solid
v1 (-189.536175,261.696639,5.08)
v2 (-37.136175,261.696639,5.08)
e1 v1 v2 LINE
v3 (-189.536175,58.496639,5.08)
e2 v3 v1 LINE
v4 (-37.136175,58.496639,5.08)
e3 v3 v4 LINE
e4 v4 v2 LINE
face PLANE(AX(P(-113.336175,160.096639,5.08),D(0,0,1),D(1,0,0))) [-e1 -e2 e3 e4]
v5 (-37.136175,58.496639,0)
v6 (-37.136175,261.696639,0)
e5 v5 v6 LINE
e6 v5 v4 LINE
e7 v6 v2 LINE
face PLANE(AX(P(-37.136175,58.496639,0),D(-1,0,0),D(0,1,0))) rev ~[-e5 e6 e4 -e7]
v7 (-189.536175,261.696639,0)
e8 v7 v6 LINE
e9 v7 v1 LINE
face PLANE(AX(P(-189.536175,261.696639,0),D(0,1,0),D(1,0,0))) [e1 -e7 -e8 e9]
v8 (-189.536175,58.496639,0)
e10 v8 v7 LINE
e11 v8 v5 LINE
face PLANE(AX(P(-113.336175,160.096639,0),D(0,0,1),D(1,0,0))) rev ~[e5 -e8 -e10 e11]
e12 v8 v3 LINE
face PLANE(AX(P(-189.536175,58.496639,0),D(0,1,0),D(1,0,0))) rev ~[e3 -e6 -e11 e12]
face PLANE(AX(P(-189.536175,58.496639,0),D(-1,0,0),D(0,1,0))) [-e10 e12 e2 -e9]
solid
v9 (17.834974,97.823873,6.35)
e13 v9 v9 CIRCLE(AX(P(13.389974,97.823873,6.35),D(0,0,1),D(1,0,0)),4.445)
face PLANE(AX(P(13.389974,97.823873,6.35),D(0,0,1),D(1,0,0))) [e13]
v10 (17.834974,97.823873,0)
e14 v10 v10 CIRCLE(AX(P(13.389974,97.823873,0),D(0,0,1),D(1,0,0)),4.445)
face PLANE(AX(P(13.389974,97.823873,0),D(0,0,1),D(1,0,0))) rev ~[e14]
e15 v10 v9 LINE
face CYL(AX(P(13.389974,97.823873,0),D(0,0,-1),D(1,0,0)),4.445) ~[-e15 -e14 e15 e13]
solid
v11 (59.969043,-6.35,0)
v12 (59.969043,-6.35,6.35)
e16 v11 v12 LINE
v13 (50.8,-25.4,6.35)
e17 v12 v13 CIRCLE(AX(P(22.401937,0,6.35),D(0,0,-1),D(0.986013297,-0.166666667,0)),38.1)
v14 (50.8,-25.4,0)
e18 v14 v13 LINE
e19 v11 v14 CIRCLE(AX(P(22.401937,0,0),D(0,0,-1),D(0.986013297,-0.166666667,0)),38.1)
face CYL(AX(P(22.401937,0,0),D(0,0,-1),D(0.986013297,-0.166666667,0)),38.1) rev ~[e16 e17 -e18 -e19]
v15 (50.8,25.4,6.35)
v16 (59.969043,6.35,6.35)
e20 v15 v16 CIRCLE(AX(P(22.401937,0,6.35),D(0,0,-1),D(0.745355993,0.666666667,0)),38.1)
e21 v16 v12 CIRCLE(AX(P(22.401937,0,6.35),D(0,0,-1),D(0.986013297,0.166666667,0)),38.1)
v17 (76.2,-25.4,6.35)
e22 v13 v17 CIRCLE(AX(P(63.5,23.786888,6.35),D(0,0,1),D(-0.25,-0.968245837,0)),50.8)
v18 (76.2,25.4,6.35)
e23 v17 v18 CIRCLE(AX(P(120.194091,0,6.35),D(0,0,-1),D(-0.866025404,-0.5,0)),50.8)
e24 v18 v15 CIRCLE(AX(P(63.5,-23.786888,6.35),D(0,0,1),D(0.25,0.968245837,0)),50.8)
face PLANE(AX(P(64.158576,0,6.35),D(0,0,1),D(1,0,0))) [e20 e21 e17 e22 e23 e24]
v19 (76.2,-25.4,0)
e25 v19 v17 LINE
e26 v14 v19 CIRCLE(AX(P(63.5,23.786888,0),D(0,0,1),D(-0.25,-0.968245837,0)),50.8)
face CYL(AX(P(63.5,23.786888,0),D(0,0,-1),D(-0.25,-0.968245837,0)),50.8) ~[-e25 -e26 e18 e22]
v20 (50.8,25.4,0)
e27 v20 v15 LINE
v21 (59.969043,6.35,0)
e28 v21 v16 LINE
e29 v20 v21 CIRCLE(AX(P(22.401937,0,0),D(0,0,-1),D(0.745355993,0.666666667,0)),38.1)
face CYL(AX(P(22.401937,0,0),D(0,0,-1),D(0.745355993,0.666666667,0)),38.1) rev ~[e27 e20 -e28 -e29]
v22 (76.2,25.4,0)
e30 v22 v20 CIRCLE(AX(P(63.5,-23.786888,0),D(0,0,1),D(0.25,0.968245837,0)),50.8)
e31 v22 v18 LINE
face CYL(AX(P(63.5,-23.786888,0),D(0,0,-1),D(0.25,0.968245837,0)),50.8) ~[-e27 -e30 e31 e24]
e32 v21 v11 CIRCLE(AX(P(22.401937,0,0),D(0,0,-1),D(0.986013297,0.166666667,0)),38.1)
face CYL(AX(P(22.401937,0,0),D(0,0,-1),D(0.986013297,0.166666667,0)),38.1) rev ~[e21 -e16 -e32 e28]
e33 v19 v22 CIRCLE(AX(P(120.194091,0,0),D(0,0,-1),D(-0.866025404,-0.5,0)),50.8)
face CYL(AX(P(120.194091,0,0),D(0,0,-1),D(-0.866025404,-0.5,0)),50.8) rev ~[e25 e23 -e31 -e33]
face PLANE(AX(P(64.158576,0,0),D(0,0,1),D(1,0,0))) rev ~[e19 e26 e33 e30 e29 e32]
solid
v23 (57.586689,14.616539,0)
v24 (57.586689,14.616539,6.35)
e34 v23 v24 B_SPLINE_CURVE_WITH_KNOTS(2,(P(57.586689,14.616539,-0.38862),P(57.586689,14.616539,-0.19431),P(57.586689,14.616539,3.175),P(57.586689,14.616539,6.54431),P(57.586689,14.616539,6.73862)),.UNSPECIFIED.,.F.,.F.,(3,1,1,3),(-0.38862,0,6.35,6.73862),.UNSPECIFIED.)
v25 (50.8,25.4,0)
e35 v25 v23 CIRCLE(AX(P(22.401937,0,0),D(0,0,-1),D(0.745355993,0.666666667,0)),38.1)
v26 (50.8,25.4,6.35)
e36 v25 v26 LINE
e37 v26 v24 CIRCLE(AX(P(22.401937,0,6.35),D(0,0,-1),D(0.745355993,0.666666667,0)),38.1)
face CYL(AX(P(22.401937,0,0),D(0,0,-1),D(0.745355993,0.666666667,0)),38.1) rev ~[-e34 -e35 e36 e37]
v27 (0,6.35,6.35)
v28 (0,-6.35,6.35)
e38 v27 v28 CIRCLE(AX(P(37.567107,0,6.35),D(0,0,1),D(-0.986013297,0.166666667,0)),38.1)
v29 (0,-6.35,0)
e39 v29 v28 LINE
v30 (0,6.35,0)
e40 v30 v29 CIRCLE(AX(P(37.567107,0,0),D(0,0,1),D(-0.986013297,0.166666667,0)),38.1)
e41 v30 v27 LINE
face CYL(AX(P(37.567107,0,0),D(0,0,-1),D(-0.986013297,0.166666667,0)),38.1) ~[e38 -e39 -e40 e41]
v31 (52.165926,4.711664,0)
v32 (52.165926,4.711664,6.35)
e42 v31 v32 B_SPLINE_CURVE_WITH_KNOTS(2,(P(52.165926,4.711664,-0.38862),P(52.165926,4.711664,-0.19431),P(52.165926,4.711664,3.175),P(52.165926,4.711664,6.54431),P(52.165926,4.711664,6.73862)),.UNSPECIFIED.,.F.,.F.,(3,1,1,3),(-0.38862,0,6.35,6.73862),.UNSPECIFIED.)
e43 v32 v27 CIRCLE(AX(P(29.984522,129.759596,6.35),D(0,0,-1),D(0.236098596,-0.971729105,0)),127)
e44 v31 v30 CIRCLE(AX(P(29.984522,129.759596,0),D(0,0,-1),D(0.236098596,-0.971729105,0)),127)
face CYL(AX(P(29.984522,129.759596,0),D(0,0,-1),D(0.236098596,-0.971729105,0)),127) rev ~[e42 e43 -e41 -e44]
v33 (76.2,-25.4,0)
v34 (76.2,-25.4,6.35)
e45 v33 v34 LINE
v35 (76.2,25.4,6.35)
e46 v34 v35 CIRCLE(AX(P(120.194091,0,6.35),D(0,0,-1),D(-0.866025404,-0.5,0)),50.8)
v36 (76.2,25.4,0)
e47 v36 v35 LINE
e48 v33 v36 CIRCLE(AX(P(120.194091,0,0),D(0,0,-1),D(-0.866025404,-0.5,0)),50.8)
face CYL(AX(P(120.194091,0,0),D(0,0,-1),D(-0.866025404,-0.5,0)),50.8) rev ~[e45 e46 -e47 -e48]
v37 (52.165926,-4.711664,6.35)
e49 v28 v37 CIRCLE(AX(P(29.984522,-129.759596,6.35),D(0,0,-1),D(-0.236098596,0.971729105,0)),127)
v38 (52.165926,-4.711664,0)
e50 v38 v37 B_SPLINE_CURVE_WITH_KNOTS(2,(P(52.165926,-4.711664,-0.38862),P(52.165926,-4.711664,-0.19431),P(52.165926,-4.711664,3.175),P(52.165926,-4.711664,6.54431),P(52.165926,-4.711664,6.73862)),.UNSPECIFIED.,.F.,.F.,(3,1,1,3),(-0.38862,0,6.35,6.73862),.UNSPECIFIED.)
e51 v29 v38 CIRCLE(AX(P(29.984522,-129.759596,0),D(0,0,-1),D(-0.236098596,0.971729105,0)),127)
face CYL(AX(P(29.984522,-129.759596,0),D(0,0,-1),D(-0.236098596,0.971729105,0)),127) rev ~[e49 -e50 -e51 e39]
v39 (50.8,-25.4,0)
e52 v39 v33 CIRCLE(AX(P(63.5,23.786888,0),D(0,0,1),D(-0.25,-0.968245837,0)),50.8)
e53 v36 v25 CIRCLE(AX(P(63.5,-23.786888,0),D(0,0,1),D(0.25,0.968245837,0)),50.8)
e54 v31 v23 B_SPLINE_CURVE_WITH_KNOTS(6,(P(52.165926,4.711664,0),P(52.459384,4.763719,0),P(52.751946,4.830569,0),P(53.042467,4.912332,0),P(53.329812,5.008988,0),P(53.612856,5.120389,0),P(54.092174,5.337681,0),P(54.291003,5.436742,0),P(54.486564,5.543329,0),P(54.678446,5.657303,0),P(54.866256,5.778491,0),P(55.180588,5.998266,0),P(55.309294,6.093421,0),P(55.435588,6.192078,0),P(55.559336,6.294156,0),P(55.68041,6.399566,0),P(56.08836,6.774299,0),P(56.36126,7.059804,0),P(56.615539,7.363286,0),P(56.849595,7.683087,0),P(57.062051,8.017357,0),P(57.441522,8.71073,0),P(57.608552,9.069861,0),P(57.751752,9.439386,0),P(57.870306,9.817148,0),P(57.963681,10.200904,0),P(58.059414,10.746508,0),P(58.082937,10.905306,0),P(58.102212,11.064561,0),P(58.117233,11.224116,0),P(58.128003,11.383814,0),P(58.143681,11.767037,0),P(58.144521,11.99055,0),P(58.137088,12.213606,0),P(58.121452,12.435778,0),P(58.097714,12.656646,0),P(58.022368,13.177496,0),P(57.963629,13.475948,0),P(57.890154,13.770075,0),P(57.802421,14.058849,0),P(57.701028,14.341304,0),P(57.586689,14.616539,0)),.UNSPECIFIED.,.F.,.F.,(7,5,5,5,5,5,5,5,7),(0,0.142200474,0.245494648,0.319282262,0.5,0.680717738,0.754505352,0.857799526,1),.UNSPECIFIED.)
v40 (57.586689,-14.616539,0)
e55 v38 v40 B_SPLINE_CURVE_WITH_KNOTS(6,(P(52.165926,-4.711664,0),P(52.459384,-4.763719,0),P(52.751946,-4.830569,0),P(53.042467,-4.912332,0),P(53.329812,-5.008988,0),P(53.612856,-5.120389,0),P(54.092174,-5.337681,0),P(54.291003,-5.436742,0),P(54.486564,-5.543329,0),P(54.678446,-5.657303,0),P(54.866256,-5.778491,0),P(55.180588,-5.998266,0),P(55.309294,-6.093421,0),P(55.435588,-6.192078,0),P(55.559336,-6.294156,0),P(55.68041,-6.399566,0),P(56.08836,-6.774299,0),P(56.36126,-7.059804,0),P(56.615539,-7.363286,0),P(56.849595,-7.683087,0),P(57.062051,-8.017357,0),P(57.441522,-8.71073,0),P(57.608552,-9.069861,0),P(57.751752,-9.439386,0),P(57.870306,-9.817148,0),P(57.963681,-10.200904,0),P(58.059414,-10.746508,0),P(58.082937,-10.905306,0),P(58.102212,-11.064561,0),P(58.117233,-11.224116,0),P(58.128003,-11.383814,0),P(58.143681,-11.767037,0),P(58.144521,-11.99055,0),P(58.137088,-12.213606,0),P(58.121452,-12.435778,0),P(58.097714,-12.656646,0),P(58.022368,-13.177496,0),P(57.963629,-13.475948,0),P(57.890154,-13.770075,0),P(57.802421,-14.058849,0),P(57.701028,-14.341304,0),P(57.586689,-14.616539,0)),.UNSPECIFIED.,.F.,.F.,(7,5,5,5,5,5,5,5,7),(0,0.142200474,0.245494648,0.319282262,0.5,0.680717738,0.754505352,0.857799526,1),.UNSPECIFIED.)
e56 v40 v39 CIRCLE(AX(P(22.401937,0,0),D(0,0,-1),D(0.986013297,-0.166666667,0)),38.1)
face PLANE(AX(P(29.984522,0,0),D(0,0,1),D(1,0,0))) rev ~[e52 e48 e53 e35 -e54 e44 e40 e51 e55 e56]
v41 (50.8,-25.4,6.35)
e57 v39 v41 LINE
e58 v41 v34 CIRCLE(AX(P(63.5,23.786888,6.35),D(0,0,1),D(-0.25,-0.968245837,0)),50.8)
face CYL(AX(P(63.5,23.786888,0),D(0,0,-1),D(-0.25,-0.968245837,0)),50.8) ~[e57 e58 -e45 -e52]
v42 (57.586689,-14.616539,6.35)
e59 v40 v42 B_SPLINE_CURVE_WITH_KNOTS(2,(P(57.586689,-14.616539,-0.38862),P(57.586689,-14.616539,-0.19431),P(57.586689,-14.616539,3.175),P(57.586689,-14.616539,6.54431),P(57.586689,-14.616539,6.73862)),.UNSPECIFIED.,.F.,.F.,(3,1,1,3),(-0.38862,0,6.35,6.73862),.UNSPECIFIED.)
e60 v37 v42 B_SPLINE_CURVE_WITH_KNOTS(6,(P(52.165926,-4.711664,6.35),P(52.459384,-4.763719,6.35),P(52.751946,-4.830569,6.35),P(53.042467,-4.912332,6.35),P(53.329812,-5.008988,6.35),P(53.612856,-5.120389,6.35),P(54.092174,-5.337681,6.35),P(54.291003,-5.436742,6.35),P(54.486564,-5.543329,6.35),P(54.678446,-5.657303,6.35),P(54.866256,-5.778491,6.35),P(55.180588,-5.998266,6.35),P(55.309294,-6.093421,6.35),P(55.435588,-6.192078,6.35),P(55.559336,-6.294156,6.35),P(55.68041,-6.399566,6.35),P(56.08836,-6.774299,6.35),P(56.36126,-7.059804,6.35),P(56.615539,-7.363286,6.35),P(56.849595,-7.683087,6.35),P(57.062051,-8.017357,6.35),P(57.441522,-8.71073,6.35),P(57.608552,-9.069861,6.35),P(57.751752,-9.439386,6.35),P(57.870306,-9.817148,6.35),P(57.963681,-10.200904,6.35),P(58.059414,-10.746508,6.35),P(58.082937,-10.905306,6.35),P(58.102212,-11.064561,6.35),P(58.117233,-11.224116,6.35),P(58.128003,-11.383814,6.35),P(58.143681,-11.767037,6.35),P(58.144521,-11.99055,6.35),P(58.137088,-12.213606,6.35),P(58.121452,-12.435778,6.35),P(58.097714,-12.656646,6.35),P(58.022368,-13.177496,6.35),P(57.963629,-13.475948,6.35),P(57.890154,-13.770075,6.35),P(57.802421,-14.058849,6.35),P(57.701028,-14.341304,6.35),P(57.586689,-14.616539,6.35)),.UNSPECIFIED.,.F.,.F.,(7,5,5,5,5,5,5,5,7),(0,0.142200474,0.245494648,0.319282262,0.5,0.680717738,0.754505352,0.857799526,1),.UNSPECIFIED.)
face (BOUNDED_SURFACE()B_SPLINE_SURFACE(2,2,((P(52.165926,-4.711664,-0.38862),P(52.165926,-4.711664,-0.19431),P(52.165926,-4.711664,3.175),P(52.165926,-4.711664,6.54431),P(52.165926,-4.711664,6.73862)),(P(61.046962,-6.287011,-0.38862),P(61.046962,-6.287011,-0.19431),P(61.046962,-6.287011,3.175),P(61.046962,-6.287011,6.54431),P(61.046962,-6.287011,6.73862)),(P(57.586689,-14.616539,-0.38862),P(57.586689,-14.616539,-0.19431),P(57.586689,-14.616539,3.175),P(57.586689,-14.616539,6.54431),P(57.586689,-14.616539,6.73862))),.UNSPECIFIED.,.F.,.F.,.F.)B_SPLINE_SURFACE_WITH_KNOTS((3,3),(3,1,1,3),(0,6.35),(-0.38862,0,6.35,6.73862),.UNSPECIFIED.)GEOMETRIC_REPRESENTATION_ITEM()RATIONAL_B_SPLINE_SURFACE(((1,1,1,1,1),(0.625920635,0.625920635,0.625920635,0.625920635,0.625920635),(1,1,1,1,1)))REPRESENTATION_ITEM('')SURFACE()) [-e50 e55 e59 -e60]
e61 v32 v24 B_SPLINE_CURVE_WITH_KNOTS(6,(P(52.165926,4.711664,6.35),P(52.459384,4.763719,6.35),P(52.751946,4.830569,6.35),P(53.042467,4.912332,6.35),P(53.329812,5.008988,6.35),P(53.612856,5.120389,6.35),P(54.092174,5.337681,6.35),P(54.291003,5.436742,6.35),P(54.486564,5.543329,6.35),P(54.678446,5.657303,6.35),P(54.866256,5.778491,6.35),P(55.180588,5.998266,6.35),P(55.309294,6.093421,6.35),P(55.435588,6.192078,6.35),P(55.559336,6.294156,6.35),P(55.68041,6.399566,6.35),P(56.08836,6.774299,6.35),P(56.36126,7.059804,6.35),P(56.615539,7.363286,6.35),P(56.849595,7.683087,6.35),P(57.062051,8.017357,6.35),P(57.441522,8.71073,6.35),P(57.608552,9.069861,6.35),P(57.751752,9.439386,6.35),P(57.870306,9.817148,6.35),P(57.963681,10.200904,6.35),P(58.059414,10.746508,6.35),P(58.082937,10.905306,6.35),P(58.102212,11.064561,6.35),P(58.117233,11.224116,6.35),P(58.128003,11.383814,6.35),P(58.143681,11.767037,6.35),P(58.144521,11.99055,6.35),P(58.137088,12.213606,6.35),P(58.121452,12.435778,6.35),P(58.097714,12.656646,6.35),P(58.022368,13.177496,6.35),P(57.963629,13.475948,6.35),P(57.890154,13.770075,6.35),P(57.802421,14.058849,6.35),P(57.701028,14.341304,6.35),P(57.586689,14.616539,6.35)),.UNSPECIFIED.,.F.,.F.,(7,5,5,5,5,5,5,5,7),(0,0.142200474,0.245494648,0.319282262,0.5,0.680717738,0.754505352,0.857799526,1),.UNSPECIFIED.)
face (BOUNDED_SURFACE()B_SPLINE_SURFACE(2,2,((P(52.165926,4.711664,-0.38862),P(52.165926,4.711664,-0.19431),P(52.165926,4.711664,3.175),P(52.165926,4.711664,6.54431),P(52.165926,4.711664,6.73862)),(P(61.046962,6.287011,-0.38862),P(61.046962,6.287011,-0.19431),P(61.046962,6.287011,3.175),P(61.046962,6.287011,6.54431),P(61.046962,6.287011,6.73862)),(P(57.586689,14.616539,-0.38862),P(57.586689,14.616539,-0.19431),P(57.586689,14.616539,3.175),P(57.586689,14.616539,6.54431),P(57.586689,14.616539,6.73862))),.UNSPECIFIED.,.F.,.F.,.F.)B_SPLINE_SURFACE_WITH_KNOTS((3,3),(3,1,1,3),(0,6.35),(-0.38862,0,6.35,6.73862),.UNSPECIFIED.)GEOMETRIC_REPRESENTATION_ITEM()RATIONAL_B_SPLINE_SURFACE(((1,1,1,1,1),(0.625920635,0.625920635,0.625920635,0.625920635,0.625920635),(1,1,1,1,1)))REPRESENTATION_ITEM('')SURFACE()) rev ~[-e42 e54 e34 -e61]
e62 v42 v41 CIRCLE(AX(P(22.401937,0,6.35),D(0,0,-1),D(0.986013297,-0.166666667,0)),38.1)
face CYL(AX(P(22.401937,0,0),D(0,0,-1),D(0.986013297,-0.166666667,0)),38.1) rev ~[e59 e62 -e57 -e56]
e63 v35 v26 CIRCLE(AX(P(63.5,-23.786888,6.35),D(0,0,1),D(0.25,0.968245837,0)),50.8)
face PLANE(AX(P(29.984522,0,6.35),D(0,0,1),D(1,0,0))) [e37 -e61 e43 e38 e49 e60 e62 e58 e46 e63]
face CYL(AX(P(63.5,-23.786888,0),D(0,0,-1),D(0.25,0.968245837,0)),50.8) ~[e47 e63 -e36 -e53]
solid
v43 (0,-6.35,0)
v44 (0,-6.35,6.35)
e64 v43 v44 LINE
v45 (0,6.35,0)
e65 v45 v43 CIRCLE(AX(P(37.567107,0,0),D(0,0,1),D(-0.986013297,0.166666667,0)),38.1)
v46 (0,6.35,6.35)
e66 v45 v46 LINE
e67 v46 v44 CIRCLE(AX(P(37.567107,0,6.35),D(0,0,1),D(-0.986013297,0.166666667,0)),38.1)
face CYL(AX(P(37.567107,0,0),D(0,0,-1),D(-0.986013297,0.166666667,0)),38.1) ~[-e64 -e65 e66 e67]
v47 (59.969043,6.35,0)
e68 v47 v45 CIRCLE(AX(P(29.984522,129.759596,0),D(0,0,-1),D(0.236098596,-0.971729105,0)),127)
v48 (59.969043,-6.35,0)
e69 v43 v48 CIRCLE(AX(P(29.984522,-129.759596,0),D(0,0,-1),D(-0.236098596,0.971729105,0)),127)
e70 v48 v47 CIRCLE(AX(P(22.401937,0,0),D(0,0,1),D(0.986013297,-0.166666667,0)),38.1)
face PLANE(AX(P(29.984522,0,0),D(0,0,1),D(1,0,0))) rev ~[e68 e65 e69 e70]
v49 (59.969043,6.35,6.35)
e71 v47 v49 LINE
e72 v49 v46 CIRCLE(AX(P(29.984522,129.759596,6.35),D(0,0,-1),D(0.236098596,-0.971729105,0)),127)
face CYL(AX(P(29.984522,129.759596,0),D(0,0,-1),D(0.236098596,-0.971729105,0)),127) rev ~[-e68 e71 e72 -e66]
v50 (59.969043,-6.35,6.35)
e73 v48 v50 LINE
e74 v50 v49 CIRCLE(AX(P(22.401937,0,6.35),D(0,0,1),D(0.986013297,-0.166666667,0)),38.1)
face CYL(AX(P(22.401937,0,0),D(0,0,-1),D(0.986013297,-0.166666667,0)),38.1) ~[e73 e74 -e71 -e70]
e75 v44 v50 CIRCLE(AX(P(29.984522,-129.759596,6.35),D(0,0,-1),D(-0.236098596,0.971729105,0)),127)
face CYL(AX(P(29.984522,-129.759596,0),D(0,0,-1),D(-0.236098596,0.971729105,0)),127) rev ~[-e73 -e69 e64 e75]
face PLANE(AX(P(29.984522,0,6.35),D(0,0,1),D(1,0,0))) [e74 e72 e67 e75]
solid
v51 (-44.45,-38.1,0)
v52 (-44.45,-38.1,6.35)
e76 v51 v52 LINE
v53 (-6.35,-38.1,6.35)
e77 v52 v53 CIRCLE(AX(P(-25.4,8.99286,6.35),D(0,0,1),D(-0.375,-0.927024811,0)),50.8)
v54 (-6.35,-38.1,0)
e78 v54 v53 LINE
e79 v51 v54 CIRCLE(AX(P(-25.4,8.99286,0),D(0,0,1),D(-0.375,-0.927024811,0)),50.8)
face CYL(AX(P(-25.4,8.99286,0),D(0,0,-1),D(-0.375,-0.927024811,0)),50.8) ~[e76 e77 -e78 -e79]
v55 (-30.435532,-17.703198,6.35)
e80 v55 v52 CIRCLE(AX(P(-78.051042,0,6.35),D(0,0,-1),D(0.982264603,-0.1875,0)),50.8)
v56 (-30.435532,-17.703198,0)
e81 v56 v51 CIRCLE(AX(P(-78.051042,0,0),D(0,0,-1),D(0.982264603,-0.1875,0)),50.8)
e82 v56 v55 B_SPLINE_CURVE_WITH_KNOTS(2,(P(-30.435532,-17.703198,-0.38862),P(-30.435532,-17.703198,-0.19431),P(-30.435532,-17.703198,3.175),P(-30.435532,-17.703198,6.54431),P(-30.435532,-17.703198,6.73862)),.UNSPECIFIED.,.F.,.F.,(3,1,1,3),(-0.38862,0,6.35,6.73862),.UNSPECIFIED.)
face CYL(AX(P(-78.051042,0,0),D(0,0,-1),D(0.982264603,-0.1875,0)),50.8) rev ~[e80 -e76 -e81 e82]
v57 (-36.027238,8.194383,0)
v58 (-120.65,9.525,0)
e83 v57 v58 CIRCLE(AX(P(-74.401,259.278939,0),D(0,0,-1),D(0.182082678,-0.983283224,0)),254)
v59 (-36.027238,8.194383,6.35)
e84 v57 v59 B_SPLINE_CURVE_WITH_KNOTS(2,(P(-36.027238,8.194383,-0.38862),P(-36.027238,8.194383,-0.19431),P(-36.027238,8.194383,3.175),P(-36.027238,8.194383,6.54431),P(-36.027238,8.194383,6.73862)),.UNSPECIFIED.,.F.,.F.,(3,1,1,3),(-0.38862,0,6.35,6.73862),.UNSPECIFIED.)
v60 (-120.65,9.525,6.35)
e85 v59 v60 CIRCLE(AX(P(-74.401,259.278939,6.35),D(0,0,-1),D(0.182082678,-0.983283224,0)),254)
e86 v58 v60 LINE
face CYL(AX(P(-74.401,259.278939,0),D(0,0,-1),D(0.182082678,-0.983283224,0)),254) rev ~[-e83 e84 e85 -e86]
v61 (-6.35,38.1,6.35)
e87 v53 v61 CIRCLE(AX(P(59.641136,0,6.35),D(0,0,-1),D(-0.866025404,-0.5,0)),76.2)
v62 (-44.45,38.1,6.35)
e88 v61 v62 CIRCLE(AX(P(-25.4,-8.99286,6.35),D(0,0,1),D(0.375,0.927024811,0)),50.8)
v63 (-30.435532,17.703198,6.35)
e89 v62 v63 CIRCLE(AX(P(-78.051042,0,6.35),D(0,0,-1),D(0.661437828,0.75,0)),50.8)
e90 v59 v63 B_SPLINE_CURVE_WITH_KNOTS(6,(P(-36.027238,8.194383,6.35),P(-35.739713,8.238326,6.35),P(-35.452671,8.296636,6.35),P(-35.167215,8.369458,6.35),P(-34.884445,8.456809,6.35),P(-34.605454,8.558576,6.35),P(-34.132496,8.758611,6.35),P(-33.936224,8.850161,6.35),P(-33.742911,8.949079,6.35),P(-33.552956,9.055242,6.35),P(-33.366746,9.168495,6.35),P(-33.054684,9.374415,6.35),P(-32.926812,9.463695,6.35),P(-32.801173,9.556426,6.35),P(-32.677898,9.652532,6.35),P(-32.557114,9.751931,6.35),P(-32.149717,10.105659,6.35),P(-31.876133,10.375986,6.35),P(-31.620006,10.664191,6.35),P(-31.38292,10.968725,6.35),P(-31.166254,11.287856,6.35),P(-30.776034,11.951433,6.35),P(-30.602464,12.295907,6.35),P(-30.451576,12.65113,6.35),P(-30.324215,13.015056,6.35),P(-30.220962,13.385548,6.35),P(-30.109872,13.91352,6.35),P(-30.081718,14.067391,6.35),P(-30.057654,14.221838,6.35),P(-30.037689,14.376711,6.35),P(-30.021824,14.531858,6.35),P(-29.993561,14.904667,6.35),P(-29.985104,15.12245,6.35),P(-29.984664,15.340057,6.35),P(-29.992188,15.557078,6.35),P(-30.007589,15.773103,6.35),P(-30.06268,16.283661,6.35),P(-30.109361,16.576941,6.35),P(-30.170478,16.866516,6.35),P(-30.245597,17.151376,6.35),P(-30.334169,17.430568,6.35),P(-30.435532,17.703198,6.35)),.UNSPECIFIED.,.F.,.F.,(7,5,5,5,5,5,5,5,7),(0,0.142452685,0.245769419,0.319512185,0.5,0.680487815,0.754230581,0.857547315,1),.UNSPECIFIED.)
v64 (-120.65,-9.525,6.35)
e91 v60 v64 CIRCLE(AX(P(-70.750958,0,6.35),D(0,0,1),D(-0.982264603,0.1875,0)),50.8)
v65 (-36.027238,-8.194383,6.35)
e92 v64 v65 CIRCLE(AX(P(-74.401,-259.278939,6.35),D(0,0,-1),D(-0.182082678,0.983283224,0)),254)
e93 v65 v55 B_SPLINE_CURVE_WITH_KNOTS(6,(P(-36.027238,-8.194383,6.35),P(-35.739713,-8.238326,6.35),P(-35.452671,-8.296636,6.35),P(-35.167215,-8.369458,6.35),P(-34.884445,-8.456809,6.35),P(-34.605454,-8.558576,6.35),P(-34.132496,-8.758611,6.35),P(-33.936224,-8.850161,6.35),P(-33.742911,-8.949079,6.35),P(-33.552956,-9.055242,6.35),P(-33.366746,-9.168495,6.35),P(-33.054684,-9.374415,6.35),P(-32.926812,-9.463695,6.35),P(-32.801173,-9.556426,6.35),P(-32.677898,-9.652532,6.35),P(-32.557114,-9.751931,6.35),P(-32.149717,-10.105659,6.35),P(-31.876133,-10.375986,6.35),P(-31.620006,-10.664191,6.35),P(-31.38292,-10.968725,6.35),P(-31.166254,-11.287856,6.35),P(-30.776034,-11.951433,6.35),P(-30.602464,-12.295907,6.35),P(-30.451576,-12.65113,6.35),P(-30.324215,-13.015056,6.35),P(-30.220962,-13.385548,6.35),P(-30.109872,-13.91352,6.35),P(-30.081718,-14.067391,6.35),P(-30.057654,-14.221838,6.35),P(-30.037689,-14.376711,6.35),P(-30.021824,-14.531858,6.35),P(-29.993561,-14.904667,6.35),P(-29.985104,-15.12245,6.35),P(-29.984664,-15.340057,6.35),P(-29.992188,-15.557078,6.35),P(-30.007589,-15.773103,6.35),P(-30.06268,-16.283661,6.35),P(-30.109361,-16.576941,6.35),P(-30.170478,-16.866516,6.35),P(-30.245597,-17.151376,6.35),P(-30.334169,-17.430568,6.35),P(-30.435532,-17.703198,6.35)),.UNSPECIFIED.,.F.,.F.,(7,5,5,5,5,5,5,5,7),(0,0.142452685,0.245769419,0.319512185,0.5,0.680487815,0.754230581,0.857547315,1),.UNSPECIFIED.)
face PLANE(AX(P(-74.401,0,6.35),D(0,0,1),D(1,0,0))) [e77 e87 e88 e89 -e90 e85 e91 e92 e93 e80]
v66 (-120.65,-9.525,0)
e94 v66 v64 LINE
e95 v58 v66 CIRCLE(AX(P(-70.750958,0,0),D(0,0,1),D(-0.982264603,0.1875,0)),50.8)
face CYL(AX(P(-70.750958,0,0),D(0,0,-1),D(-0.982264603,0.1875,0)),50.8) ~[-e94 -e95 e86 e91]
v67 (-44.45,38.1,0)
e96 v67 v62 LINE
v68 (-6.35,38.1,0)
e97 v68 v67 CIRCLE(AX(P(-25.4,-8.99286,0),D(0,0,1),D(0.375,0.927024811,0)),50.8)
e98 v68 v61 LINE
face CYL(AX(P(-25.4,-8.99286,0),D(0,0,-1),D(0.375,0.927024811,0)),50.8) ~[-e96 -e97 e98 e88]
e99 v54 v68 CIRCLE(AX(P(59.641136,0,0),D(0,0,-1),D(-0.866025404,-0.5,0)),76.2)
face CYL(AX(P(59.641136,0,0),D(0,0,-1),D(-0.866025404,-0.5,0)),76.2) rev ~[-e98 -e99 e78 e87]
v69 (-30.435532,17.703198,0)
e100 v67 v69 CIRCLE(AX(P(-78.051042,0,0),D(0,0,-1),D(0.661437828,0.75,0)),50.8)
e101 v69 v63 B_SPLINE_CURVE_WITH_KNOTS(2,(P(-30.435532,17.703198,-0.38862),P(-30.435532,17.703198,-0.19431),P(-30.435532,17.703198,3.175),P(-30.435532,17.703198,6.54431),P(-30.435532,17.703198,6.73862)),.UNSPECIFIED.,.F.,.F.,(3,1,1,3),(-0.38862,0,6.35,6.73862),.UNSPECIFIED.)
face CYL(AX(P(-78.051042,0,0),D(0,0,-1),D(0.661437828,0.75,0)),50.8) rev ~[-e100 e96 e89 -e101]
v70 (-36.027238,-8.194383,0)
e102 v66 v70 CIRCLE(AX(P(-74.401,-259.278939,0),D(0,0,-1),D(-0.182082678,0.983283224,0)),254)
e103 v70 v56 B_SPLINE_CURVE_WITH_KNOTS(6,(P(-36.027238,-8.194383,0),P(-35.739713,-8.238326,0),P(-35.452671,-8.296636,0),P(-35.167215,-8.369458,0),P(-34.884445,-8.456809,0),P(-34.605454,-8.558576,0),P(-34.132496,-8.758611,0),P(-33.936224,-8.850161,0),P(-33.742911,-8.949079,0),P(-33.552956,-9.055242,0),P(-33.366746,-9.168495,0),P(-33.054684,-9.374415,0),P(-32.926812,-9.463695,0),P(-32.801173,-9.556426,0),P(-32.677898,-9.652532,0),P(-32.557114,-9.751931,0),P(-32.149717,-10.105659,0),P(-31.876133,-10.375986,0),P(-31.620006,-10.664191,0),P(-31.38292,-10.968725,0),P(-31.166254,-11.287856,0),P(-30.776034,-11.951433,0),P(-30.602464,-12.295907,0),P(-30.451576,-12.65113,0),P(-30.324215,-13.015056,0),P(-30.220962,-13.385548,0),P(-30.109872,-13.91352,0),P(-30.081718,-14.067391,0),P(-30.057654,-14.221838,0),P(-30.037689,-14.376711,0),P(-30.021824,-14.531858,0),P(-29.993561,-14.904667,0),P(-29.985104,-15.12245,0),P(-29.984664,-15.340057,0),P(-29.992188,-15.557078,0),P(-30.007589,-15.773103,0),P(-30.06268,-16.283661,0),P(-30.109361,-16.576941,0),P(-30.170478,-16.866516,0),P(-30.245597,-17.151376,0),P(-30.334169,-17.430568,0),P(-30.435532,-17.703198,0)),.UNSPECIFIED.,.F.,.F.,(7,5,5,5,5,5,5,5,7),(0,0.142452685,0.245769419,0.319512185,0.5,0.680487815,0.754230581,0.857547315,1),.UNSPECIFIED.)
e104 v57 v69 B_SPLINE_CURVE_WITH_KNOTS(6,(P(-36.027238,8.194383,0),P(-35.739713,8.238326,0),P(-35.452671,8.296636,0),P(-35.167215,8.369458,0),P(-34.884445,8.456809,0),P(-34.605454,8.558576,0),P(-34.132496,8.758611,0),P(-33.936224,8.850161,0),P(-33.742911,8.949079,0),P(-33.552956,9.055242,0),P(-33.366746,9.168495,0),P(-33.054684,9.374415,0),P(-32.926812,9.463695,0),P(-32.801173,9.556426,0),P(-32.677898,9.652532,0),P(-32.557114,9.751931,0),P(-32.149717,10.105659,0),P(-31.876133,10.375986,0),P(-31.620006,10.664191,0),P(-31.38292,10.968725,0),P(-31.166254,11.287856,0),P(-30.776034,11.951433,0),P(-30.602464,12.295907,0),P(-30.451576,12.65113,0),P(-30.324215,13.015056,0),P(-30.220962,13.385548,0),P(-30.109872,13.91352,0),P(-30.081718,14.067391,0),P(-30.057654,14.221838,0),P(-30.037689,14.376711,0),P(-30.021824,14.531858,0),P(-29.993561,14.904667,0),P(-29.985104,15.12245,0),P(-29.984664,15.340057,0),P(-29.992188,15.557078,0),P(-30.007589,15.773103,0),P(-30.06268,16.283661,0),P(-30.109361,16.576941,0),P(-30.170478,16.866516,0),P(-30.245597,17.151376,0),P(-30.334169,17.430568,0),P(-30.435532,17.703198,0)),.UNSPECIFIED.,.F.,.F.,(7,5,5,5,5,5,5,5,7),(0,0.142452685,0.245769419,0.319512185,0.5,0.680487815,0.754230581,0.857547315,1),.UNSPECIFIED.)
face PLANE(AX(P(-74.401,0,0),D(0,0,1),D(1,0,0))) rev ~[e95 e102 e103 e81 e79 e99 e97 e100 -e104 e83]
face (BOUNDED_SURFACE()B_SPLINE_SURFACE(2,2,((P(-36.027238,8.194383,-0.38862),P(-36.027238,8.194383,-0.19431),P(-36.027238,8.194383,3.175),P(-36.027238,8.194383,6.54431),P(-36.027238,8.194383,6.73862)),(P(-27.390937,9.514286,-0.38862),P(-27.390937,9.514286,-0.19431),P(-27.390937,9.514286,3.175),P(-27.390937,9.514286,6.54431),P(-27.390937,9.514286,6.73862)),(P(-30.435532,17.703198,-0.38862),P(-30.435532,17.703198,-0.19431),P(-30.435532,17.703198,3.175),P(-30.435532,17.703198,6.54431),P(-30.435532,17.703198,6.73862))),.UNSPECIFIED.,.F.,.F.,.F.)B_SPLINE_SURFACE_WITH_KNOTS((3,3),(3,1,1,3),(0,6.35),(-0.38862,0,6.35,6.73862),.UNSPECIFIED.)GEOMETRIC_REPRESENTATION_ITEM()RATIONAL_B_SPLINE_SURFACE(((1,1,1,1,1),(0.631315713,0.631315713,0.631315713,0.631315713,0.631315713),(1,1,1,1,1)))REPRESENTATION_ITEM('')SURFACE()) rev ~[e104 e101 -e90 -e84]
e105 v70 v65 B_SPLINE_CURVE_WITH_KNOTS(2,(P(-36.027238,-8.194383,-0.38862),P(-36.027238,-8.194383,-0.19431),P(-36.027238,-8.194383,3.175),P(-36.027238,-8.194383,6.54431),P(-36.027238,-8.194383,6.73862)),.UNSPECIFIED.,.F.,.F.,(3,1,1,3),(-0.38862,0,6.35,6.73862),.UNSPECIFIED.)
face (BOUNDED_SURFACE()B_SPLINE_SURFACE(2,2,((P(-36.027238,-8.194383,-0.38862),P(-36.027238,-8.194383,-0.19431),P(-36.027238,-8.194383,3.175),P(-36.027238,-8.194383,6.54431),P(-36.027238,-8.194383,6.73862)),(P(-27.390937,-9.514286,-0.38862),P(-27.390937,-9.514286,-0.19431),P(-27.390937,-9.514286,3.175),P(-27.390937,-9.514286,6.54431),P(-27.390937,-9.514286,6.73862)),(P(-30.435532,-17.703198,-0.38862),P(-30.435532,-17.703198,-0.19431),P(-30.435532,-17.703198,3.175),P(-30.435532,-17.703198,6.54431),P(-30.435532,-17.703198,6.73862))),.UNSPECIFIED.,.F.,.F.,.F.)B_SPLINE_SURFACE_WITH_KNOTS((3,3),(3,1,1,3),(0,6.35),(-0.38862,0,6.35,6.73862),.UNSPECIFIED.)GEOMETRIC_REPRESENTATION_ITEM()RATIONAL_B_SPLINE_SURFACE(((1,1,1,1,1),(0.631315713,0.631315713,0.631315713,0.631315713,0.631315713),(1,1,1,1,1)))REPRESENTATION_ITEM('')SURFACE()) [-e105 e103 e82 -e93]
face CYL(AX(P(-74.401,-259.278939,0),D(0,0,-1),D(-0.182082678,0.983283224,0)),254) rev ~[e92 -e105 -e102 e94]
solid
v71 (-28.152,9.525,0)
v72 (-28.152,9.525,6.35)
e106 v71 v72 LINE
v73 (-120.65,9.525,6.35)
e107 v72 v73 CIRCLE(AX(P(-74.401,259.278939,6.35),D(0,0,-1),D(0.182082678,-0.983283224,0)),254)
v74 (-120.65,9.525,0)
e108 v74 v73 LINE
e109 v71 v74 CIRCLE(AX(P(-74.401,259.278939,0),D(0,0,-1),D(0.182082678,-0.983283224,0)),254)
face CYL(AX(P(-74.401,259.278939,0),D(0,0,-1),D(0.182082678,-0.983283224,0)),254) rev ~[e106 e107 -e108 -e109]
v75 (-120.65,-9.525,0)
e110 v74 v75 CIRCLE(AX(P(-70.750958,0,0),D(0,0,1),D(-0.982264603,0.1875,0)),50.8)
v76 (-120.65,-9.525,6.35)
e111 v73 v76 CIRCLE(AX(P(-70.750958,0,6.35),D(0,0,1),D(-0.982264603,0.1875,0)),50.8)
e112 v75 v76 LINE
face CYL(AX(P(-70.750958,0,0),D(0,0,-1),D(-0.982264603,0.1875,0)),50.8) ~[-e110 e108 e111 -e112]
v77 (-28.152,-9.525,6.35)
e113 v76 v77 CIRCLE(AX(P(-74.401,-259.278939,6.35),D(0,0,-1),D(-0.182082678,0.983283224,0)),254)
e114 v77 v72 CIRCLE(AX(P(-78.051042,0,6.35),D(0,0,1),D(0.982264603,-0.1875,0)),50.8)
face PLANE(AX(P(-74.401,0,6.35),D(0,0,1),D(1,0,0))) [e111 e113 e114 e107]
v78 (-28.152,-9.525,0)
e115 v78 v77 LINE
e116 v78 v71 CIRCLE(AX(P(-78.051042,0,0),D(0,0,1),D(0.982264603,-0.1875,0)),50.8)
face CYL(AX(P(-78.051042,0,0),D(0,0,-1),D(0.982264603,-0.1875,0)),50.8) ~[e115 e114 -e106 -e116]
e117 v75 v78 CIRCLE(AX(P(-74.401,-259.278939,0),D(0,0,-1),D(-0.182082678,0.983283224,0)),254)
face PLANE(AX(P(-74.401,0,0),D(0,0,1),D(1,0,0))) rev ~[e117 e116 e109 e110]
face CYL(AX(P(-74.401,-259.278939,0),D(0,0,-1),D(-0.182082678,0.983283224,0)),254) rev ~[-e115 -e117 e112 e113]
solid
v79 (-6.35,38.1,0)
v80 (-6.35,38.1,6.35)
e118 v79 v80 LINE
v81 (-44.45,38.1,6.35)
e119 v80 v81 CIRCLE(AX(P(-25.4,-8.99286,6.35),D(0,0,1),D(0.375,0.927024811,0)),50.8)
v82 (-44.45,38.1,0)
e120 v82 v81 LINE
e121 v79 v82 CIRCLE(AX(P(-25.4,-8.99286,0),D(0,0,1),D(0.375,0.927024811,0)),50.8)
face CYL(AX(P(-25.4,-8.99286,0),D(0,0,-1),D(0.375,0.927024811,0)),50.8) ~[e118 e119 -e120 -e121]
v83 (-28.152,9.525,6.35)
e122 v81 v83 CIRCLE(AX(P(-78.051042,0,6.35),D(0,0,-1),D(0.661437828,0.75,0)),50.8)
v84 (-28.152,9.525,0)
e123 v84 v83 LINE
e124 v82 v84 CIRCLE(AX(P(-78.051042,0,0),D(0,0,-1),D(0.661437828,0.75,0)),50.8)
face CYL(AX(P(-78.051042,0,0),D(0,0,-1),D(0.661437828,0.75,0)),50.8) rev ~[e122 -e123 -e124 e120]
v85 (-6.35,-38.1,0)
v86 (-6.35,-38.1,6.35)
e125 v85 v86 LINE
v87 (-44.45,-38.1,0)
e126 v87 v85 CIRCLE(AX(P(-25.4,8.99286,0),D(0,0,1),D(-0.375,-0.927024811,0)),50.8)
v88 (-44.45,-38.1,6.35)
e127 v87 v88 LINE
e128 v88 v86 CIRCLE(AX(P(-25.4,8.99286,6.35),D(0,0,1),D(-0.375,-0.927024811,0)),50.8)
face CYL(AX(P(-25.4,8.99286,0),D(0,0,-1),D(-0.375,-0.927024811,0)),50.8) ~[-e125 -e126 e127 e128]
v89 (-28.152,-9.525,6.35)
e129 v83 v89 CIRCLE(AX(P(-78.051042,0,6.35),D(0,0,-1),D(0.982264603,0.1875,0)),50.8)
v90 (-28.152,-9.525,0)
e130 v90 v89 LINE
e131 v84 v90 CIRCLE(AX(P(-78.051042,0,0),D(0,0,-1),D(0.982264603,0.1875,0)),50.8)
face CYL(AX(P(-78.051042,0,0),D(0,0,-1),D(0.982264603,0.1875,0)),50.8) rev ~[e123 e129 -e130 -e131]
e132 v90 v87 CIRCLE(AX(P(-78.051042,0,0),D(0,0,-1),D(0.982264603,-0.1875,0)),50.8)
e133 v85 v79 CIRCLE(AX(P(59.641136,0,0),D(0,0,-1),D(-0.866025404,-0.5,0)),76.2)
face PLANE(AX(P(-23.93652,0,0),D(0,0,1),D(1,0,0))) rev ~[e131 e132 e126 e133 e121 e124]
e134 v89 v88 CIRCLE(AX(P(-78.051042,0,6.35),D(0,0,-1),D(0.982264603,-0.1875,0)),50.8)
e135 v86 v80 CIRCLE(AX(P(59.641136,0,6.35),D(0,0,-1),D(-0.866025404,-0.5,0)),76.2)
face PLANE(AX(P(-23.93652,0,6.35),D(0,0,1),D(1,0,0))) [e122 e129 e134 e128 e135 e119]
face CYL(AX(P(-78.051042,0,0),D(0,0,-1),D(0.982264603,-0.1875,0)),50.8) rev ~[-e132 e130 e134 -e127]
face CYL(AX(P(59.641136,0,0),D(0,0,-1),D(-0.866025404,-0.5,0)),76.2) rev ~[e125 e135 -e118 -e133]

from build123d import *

# Parameters (mm, degrees)
F1_DEPTH  = 6.35
F2_R      = 7.112
F4_DEPTH  = 6.35
F5_R      = 7.239
F6_DEPTH  = 6.35
F7_DEPTH  = 6.35
F8_DEPTH  = 6.35
F9_DEPTH  = 6.35
F10_W     = 152.4
F10_H     = 203.2
F11_DEPTH = 5.08
F12_R     = 4.445
F13_DEPTH = 6.35


# Not quite as in the source:
# - a length typed as a fraction of an inch, garbled in the dataset ("3 / 203.2 mm" for 3/8 in), is restored


with BuildPart() as f1:
    # F0 (on Top) → F1 (new body)
    with BuildSketch(Plane.XY):
        with BuildLine():
            ThreePointArc((-28.1519998261, -9.525), (-27.2510416505, 0), (-28.1519998261, 9.525))
            ThreePointArc((-28.1519998261, 9.525), (-74.400999913, 5.2789388898), (-120.65, 9.525))
            ThreePointArc((-120.65, 9.525), (-121.5509581755, 0), (-120.65, -9.525))
            ThreePointArc((-120.65, -9.525), (-74.400999913, -5.2789388898), (-28.1519998261, -9.525))
        make_face()
        with BuildLine():
            ThreePointArc((-6.35, -38.1), (-16.5588642316, 0), (-6.35, 38.1))
            ThreePointArc((-6.35, 38.1), (-25.4, 41.8071396069), (-44.45, 38.1))
            ThreePointArc((-44.45, 38.1), (-33.9239678598, 25.1682609385), (-28.1519998261, 9.525))
            ThreePointArc((-28.1519998261, 9.525), (-27.2510416505, 0), (-28.1519998261, -9.525))
            ThreePointArc((-28.1519998261, -9.525), (-33.9239678598, -25.1682609385), (-44.45, -38.1))
            ThreePointArc((-44.45, -38.1), (-25.4, -41.8071396069), (-6.35, -38.1))
        make_face()
    extrude(amount=F1_DEPTH)

    # F2
    f2_edges = [f1.edges().sort_by_distance(p)[0] for p in [
        (-28.152, 9.525, 3.175),
        (-28.152, -9.525, 3.175),
    ]]
    fillet(f2_edges, radius=F2_R)


with BuildPart() as f4:
    # F3 (on Top) → F4 (new body)
    with BuildSketch(Plane.XY):
        with BuildLine():
            ThreePointArc((59.9690433084, -6.35), (60.5019366858, 0), (59.9690433084, 6.35))
            ThreePointArc((59.9690433084, 6.35), (29.9845216542, 2.7595963091), (0, 6.35))
            ThreePointArc((0, 6.35), (-0.5328933773, 0), (0, -6.35))
            ThreePointArc((0, -6.35), (29.9845216542, -2.7595963091), (59.9690433084, -6.35))
        make_face()
        with BuildLine():
            ThreePointArc((76.2, -25.4), (69.3940905122, 0), (76.2, 25.4))
            ThreePointArc((76.2, 25.4), (63.5, 27.0131115032), (50.8, 25.4))
            ThreePointArc((50.8, 25.4), (56.7323391914, 16.5237242714), (59.9690433084, 6.35))
            ThreePointArc((59.9690433084, 6.35), (60.5019366858, 0), (59.9690433084, -6.35))
            ThreePointArc((59.9690433084, -6.35), (56.7323391914, -16.5237242714), (50.8, -25.4))
            ThreePointArc((50.8, -25.4), (63.5, -27.0131115032), (76.2, -25.4))
        make_face()
    extrude(amount=F4_DEPTH)

    # F5
    f5_edges = [f4.edges().sort_by_distance(p)[0] for p in [
        (59.969043, -6.35, 3.175),
        (59.969043, 6.35, 3.175),
    ]]
    fillet(f5_edges, radius=F5_R)


with BuildPart() as f6:
    # F0 (on Top) → F6 (new body)
    with BuildSketch(Plane.XY):
        with BuildLine():
            ThreePointArc((-6.35, -38.1), (-16.5588642316, 0), (-6.35, 38.1))
            ThreePointArc((-6.35, 38.1), (-25.4, 41.8071396069), (-44.45, 38.1))
            ThreePointArc((-44.45, 38.1), (-33.9239678598, 25.1682609385), (-28.1519998261, 9.525))
            ThreePointArc((-28.1519998261, 9.525), (-27.2510416505, 0), (-28.1519998261, -9.525))
            ThreePointArc((-28.1519998261, -9.525), (-33.9239678598, -25.1682609385), (-44.45, -38.1))
            ThreePointArc((-44.45, -38.1), (-25.4, -41.8071396069), (-6.35, -38.1))
        make_face()
    extrude(amount=F6_DEPTH)


with BuildPart() as f7:
    # F0 (on Top) → F7 (new body)
    with BuildSketch(Plane.XY):
        with BuildLine():
            ThreePointArc((-28.1519998261, -9.525), (-27.2510416505, 0), (-28.1519998261, 9.525))
            ThreePointArc((-28.1519998261, 9.525), (-74.400999913, 5.2789388898), (-120.65, 9.525))
            ThreePointArc((-120.65, 9.525), (-121.5509581755, 0), (-120.65, -9.525))
            ThreePointArc((-120.65, -9.525), (-74.400999913, -5.2789388898), (-28.1519998261, -9.525))
        make_face()
    extrude(amount=F7_DEPTH)


with BuildPart() as f8:
    # F3 (on Top) → F8 (new body)
    with BuildSketch(Plane.XY):
        with BuildLine():
            ThreePointArc((76.2, -25.4), (69.3940905122, 0), (76.2, 25.4))
            ThreePointArc((76.2, 25.4), (63.5, 27.0131115032), (50.8, 25.4))
            ThreePointArc((50.8, 25.4), (56.7323391914, 16.5237242714), (59.9690433084, 6.35))
            ThreePointArc((59.9690433084, 6.35), (60.5019366858, 0), (59.9690433084, -6.35))
            ThreePointArc((59.9690433084, -6.35), (56.7323391914, -16.5237242714), (50.8, -25.4))
            ThreePointArc((50.8, -25.4), (63.5, -27.0131115032), (76.2, -25.4))
        make_face()
    extrude(amount=F8_DEPTH)


with BuildPart() as f9:
    # F3 (on Top) → F9 (new body)
    with BuildSketch(Plane.XY):
        with BuildLine():
            ThreePointArc((59.9690433084, -6.35), (60.5019366858, 0), (59.9690433084, 6.35))
            ThreePointArc((59.9690433084, 6.35), (29.9845216542, 2.7595963091), (0, 6.35))
            ThreePointArc((0, 6.35), (-0.5328933773, 0), (0, -6.35))
            ThreePointArc((0, -6.35), (29.9845216542, -2.7595963091), (59.9690433084, -6.35))
        make_face()
    extrude(amount=F9_DEPTH)


with BuildPart() as f11:
    # F10 (on Top) → F11 (new body)
    with BuildSketch(Plane.XY):
        with Locations((-113.3361747384, 160.0966391325)):
            Rectangle(F10_W, F10_H)
    extrude(amount=F11_DEPTH)


with BuildPart() as f13:
    # F12 (on Top) → F13 (new body)
    with BuildSketch(Plane.XY):
        with Locations((13.3899739012, 97.8238731623)):
            Circle(F12_R)
    extrude(amount=F13_DEPTH)


solid = Compound([f1.part, f4.part, f6.part, f7.part, f8.part, f9.part, f11.part, f13.part])
